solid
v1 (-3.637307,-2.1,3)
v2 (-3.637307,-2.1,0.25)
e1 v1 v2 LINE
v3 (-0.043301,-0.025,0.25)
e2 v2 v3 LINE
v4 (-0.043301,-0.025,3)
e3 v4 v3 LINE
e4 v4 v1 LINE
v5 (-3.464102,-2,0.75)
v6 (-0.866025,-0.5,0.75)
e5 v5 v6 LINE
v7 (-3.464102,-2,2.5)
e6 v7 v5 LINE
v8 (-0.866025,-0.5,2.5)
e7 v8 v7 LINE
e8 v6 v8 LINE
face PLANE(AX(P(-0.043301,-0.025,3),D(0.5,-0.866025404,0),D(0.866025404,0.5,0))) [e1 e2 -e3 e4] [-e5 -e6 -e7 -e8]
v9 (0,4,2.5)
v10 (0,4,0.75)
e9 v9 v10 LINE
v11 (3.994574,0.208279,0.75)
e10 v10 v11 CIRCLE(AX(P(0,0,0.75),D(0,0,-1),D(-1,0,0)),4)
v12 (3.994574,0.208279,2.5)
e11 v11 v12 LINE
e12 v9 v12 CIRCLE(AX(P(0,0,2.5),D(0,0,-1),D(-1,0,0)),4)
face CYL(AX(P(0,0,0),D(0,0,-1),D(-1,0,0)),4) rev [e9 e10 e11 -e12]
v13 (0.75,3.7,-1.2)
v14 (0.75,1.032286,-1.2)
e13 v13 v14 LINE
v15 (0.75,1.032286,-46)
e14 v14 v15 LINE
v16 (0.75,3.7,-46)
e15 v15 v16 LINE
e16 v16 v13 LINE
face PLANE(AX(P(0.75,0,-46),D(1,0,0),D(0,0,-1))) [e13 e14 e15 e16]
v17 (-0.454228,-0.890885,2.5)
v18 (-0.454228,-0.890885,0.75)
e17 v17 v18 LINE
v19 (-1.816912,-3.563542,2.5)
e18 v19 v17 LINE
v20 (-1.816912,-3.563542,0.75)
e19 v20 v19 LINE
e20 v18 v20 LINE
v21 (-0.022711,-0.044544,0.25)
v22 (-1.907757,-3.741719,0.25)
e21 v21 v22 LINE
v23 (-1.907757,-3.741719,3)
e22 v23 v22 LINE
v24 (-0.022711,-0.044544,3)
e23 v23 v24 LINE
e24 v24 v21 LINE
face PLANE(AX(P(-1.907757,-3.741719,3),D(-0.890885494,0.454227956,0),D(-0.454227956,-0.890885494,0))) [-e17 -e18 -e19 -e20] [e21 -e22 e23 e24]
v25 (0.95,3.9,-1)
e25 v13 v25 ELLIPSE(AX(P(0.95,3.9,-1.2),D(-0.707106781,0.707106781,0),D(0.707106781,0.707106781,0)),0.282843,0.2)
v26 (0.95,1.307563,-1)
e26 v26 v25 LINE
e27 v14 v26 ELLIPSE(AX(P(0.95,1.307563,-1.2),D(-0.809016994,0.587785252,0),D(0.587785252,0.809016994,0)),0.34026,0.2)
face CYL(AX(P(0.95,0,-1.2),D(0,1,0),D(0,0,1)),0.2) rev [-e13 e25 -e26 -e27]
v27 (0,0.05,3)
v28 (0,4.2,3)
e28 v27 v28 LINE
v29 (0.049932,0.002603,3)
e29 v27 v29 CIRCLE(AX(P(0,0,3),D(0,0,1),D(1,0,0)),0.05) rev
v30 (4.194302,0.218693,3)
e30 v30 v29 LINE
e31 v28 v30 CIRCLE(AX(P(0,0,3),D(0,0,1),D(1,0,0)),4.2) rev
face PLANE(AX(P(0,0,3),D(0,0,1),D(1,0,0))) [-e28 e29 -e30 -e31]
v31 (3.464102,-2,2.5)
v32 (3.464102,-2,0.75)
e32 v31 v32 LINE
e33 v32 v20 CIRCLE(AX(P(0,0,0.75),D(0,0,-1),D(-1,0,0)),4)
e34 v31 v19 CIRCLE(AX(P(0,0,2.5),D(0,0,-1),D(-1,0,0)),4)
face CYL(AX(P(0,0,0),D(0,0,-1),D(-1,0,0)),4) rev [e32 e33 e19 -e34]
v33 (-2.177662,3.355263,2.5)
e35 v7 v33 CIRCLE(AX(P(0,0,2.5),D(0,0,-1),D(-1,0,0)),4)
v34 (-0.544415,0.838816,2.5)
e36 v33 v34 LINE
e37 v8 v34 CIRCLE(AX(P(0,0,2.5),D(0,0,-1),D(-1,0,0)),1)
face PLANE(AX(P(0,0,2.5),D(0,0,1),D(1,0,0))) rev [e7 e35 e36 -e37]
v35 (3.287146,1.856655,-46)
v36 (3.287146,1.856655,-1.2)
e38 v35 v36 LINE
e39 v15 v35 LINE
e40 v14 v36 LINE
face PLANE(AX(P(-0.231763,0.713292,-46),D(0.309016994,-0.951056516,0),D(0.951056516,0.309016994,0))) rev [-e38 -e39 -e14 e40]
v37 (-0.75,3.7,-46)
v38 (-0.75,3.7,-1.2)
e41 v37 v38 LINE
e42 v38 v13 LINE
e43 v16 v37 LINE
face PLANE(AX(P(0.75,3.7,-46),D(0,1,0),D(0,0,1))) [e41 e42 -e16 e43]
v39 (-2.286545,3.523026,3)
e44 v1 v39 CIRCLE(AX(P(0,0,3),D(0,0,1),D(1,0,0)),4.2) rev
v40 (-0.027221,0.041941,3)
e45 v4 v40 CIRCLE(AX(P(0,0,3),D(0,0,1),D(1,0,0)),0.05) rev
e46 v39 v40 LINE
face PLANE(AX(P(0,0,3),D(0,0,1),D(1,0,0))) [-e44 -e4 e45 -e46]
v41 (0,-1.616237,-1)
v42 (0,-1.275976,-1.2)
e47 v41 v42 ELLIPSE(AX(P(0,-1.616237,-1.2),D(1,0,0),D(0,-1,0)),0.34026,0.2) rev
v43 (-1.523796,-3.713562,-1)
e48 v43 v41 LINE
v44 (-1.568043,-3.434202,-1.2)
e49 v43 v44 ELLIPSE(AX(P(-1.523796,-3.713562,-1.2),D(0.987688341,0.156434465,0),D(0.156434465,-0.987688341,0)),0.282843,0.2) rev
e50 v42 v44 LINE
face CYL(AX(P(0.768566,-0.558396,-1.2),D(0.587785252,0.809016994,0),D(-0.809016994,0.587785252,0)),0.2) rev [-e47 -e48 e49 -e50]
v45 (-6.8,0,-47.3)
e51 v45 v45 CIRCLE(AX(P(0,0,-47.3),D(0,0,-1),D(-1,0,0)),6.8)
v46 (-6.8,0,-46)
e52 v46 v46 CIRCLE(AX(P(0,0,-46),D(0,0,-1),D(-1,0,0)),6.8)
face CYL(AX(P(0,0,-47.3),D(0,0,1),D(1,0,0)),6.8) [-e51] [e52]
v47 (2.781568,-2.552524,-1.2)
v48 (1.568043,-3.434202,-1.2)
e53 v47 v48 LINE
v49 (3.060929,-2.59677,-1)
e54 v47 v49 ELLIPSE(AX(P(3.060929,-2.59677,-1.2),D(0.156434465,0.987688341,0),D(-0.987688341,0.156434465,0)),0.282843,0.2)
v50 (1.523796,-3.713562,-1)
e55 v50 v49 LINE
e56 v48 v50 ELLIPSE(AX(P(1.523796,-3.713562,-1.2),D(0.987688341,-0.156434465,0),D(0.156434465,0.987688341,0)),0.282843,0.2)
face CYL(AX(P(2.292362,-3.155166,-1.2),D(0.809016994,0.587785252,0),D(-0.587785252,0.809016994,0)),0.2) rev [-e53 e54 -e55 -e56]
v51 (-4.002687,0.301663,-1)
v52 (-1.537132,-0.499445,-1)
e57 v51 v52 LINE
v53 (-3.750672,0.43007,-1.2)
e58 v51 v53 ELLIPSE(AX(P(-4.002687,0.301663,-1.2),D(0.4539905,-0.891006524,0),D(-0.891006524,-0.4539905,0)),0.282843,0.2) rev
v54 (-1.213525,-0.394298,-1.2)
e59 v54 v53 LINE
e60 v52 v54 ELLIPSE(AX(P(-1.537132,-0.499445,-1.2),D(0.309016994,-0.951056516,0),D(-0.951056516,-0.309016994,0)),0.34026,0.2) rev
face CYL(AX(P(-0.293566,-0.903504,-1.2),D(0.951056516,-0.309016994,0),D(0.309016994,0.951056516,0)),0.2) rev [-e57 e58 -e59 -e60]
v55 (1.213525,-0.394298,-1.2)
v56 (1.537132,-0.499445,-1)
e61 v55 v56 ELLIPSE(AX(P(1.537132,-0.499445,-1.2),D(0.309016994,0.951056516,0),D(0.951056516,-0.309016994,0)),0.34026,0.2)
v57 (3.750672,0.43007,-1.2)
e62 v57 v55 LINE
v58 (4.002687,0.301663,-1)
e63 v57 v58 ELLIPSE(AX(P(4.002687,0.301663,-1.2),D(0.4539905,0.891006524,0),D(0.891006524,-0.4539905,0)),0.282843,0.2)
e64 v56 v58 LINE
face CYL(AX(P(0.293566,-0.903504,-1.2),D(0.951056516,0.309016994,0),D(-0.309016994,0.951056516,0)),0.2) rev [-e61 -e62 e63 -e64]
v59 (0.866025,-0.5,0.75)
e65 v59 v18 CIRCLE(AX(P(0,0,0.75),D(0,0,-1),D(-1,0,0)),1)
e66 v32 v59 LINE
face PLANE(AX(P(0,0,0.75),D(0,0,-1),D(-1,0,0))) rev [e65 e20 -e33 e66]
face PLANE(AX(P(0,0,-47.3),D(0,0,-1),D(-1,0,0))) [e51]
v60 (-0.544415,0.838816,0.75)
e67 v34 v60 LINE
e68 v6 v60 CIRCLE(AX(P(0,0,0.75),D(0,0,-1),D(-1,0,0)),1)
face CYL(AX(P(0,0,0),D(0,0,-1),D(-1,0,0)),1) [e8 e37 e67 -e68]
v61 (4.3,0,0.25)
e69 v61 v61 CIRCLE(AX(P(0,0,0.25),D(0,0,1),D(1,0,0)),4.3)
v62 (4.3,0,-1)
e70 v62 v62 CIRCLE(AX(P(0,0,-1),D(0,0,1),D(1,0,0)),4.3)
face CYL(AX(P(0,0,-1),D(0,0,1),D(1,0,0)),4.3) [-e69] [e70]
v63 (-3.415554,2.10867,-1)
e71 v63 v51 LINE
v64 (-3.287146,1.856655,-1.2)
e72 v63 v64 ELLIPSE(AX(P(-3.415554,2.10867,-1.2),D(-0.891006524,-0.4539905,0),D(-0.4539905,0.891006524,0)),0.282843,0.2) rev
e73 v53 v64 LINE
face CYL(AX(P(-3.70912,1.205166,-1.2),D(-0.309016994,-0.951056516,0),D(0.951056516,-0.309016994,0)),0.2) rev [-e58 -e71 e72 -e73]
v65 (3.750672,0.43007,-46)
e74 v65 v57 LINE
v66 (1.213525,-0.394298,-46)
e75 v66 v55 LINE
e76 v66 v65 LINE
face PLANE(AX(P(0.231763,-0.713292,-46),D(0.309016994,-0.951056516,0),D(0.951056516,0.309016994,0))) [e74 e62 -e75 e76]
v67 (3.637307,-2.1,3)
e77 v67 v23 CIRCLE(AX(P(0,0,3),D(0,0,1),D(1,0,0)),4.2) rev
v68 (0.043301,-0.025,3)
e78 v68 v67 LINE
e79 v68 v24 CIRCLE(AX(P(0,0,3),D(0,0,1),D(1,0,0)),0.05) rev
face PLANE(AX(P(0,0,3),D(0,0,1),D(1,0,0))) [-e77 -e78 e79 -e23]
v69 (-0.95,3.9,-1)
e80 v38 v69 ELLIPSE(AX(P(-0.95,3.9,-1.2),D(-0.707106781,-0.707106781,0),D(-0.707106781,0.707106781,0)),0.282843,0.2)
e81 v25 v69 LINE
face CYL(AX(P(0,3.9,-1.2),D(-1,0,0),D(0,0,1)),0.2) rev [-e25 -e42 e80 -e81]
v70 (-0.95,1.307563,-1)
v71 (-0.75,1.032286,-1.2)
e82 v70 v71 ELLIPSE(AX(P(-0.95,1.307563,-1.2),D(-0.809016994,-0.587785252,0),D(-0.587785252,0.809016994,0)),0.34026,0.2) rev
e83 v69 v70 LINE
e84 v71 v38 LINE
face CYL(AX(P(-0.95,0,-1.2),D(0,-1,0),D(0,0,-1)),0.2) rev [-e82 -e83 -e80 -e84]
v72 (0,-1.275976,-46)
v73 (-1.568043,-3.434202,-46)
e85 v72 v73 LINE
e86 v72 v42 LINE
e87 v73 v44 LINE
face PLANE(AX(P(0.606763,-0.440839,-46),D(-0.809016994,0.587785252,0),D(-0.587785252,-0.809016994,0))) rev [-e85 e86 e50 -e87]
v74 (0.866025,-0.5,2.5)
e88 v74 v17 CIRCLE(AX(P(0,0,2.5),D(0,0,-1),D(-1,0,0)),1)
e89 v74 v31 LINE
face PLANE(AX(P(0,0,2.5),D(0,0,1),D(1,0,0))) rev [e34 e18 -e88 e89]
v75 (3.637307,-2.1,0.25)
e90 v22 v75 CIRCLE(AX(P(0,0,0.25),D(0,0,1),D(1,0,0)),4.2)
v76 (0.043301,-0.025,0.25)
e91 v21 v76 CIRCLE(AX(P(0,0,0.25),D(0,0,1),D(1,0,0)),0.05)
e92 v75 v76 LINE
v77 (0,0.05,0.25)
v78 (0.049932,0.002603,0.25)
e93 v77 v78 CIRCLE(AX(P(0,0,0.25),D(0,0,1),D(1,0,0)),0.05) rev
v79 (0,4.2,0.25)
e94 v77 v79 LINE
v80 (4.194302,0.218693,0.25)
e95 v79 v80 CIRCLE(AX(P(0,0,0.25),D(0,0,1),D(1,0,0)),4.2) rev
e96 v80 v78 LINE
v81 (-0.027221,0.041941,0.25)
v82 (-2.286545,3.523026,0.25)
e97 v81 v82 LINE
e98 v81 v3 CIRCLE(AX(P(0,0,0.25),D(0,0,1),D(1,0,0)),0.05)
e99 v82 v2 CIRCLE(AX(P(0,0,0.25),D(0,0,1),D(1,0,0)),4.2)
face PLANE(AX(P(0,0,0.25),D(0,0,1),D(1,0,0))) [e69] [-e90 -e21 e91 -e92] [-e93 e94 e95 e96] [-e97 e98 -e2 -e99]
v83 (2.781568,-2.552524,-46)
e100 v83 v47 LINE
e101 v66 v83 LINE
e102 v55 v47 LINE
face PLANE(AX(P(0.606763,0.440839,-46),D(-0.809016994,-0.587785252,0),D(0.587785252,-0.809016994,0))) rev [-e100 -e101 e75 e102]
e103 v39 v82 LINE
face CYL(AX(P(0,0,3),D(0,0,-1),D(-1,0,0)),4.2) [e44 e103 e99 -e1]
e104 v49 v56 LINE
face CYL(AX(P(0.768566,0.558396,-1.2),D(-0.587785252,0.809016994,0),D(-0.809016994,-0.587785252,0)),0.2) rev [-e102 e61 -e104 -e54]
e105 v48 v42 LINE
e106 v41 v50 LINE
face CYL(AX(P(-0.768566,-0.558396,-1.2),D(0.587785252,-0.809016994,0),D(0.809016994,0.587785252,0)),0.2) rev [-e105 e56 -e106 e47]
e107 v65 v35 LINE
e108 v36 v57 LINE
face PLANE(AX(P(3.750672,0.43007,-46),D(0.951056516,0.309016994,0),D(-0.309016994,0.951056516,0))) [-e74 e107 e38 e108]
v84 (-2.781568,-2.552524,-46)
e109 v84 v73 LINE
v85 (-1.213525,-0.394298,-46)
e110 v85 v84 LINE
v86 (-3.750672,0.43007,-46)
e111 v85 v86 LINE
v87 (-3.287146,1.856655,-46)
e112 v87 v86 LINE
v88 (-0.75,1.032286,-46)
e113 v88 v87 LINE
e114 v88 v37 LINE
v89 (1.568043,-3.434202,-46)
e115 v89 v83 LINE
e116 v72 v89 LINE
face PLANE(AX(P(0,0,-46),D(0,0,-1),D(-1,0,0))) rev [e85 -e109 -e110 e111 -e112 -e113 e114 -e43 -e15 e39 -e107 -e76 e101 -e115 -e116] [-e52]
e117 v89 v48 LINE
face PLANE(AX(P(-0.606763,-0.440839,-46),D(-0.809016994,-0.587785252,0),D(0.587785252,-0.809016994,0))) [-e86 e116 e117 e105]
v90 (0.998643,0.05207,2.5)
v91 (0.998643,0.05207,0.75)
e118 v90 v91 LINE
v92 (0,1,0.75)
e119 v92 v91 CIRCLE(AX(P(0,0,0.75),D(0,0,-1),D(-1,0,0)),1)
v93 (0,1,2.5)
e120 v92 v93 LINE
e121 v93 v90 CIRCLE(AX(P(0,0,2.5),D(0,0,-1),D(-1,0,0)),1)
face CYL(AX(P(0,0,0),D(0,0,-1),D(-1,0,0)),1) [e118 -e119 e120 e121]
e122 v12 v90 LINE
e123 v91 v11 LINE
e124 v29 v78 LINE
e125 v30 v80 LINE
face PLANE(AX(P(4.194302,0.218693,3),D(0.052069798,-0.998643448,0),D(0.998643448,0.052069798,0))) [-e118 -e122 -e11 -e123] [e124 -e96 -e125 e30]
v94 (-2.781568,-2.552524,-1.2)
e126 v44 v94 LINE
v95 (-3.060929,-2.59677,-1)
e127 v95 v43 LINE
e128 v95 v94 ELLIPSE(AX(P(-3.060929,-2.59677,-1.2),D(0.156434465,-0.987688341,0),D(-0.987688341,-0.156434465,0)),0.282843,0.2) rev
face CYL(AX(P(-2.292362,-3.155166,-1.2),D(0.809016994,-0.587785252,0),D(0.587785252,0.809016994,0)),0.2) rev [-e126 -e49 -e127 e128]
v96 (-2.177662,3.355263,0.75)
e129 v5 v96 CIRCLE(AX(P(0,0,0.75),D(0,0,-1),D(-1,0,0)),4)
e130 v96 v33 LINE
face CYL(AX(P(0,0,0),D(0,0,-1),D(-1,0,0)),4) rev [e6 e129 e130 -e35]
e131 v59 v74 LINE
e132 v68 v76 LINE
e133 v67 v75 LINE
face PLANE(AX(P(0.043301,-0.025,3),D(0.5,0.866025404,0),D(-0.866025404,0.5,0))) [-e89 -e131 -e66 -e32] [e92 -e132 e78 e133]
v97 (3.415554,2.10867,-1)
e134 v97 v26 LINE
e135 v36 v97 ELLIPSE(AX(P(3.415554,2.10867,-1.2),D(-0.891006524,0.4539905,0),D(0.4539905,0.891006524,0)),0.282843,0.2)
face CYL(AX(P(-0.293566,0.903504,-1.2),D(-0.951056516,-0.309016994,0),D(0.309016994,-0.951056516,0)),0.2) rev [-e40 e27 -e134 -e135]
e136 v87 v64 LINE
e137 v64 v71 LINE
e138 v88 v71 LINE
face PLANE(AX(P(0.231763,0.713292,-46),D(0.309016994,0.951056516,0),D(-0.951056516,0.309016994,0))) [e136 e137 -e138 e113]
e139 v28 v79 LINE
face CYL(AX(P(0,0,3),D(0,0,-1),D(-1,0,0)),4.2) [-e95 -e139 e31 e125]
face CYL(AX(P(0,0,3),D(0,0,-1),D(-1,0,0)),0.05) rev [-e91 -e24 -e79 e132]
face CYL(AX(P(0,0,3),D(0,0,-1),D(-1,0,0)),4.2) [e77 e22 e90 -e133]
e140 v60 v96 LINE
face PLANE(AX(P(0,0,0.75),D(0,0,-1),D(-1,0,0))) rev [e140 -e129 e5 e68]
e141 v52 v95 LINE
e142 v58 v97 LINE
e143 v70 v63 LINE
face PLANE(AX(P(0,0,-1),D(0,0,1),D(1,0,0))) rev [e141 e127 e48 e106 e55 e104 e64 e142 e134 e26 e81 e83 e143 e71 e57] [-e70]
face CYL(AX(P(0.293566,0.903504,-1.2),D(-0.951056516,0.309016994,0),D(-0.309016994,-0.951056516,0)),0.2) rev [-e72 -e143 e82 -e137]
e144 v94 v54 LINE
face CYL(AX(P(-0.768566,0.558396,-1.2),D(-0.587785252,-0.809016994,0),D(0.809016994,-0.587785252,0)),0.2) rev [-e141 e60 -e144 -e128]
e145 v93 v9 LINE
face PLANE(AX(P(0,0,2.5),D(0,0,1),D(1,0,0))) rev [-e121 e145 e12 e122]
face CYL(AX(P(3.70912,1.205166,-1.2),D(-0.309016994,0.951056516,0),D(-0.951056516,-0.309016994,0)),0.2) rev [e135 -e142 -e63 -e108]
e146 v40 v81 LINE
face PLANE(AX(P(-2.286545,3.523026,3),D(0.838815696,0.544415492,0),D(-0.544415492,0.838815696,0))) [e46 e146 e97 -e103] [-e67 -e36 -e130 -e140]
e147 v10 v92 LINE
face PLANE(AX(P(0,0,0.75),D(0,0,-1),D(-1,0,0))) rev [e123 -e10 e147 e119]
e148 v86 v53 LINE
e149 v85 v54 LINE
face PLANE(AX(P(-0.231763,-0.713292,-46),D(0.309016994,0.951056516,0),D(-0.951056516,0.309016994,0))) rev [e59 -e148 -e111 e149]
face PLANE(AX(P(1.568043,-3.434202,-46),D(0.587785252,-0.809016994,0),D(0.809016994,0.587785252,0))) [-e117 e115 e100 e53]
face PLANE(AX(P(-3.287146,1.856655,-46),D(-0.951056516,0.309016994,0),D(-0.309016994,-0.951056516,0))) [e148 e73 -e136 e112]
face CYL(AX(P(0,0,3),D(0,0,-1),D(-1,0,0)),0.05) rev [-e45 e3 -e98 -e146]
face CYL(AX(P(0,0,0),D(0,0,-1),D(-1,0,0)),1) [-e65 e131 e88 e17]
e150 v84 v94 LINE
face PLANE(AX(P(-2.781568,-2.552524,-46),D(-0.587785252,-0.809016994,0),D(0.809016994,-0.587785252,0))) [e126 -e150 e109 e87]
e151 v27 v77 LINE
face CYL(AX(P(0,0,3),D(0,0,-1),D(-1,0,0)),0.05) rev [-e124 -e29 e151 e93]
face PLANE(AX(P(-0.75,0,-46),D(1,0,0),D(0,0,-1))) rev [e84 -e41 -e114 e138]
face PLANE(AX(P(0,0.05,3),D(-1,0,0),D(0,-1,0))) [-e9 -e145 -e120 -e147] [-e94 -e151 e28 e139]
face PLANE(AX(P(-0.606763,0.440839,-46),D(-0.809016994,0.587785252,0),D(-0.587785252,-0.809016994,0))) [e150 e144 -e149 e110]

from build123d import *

# Parameters (mm, degrees)
EXTRU_MINCE1_DEPTH      = 3
EXTRU_MINCE1_2_DEPTH    = 3
EXTRU_MINCE1_3_DEPTH    = 3
BOSS_EXTRU_1_DEPTH      = 0.25
BOSS_EXTRU_1_DEPTH_BACK = 1
ESQUISSE3_R             = 4.3
ESQUISSE3_R_2           = 0.05
ESQUISSE4_W             = 1.75
ESQUISSE4_H             = 3
EXTRU_MINCE2_DEPTH      = 45
CONG_1_R                = 0.2
ESQUISSE6_R             = 6.8
BOSS_EXTRU_2_DEPTH      = 1.3


# Read off the part's stored shape, not the designer's step: Extru.-Mince2
with BuildPart() as part:
    # Esquisse2 → Extru.-Mince1 (new body)
    with BuildSketch(Plane.XY):
        with BuildLine():
            ThreePointArc((0, 4.2), (2.89149518, 3.046187063), (4.194302481, 0.218693153))
            Line((4.194302481, 0.218693153), (0.049932172, 0.00260349))
            ThreePointArc((0.049932172, 0.00260349), (0.034422562, 0.036264132), (0, 0.05))
            Line((0, 0.05), (0, 4.2))
        make_face()
    extrude(amount=EXTRU_MINCE1_DEPTH)



with BuildPart() as body_2:
    # Esquisse2 → Extru.-Mince1 2 (new body)
    with BuildSketch(Plane.XY):
        with BuildLine():
            ThreePointArc((3.637306696, -2.1), (1.192327791, -4.027201813), (-1.907757414, -3.741719077))
            Line((-1.907757414, -3.741719077), (-0.022711398, -0.044544275))
            ThreePointArc((-0.022711398, -0.044544275), (0.014194378, -0.047942879), (0.04330127, -0.025))
            Line((0.04330127, -0.025), (3.637306696, -2.1))
        make_face()
    extrude(amount=EXTRU_MINCE1_2_DEPTH)


with BuildPart() as body_3:
    # Esquisse2 → Extru.-Mince1 3 (new body)
    with BuildSketch(Plane.XY):
        with BuildLine():
            ThreePointArc((-3.637306696, -2.1), (-4.083822971, 0.98101475), (-2.286545067, 3.523025923))
            Line((-2.286545067, 3.523025923), (-0.027220775, 0.041940785))
            ThreePointArc((-0.027220775, 0.041940785), (-0.04861694, 0.011678747), (-0.04330127, -0.025))
            Line((-0.04330127, -0.025), (-3.637306696, -2.1))
        make_face()
    extrude(amount=EXTRU_MINCE1_3_DEPTH)


with BuildPart() as part_1:
    add(part.part)

    add(body_2.part)  # Boss.-Extru.1 merges body 2

    add(body_3.part)  # Boss.-Extru.1 merges body 3
    # Esquisse3 → Boss.-Extru.1 (add, two sides: drawn at the far end of the back side and taken through both)
    # profile 1 of 2: a face of its own
    with BuildSketch(Plane.XY.offset(-BOSS_EXTRU_1_DEPTH_BACK)):
        Circle(ESQUISSE3_R)
        Circle(ESQUISSE3_R_2, mode=Mode.SUBTRACT)
    # profile 2 of 2: a face of its own
    with BuildSketch(Plane.XY.offset(-BOSS_EXTRU_1_DEPTH_BACK)):
        Circle(ESQUISSE3_R_2)
    extrude(amount=BOSS_EXTRU_1_DEPTH + BOSS_EXTRU_1_DEPTH_BACK)

    # Esquisse4 → Enlèvement de matière-Révolution1 (revolve, cut)
    with BuildSketch(Plane(origin=(0, 0, 0), x_dir=(0, 0, -1), z_dir=(1, 0, 0)), mode=Mode.PRIVATE) as enl_vement_de_mati_re_r_volution1_sk:
        with Locations((-1.625, 2.5)):
            Rectangle(ESQUISSE4_W, ESQUISSE4_H)
    revolve(enl_vement_de_mati_re_r_volution1_sk.sketch.rotate(Axis((0, 0, 0), (0, 0, 1)), 270), axis=Axis((0, 0, 0), (0, 0, 1)), mode=Mode.SUBTRACT)

    # Extru.-Mince2 outline → Extru.-Mince2 (add)
    with BuildSketch(Plane(origin=(0, 0, -1), x_dir=(-1, 0, 0), z_dir=(0, 0, -1))):
        Polygon((0.75, 1.03228644), (0.75, 3.7), (-0.75, 3.7), (-0.75, 1.03228644), (-3.287146365, 1.856655266), (-3.750671856, 0.430070492), (-1.213525492, -0.394298334), (-2.781568179, -2.55252394), (-1.568042688, -3.434201818), (0, -1.275976213), (1.568042688, -3.434201818), (2.781568179, -2.55252394), (1.213525492, -0.394298334), (3.750671856, 0.430070492), (3.287146365, 1.856655266), align=None)
    extrude(amount=EXTRU_MINCE2_DEPTH)

    # Congé1
    cong_1_edges = [part_1.edges().sort_by_distance(p)[0] for p in [
        (1.997546836, -1.473411137, -1),
        (2.018573182, 1.444470853, -1),
        (-2.482098674, 0.017886079, -1),
        (2.482098674, 0.017886079, -1),
        (3.518909111, 1.143362879, -1),
        (0.75, 2.36614322, -1),
        (0, 3.7, -1),
        (-2.018573182, 1.444470853, -1),
        (-3.51890911, 1.143362879, -1),
        (-1.997546836, -1.473411137, -1),
        (-2.174805433, -2.993362879, -1),
        (0.784021344, -2.355089015, -1),
        (2.174805433, -2.993362879, -1),
        (-0.75, 2.36614322, -1),
        (-0.784021344, -2.355089015, -1),
    ]]
    fillet(cong_1_edges, radius=CONG_1_R)

    # Esquisse6 → Boss.-Extru.2 (add)
    with BuildSketch(Plane(origin=(0, 0, -46), x_dir=(-1, 0, 0), z_dir=(0, 0, -1))):
        Circle(ESQUISSE6_R)
    extrude(amount=BOSS_EXTRU_2_DEPTH)


solid = part_1.part
